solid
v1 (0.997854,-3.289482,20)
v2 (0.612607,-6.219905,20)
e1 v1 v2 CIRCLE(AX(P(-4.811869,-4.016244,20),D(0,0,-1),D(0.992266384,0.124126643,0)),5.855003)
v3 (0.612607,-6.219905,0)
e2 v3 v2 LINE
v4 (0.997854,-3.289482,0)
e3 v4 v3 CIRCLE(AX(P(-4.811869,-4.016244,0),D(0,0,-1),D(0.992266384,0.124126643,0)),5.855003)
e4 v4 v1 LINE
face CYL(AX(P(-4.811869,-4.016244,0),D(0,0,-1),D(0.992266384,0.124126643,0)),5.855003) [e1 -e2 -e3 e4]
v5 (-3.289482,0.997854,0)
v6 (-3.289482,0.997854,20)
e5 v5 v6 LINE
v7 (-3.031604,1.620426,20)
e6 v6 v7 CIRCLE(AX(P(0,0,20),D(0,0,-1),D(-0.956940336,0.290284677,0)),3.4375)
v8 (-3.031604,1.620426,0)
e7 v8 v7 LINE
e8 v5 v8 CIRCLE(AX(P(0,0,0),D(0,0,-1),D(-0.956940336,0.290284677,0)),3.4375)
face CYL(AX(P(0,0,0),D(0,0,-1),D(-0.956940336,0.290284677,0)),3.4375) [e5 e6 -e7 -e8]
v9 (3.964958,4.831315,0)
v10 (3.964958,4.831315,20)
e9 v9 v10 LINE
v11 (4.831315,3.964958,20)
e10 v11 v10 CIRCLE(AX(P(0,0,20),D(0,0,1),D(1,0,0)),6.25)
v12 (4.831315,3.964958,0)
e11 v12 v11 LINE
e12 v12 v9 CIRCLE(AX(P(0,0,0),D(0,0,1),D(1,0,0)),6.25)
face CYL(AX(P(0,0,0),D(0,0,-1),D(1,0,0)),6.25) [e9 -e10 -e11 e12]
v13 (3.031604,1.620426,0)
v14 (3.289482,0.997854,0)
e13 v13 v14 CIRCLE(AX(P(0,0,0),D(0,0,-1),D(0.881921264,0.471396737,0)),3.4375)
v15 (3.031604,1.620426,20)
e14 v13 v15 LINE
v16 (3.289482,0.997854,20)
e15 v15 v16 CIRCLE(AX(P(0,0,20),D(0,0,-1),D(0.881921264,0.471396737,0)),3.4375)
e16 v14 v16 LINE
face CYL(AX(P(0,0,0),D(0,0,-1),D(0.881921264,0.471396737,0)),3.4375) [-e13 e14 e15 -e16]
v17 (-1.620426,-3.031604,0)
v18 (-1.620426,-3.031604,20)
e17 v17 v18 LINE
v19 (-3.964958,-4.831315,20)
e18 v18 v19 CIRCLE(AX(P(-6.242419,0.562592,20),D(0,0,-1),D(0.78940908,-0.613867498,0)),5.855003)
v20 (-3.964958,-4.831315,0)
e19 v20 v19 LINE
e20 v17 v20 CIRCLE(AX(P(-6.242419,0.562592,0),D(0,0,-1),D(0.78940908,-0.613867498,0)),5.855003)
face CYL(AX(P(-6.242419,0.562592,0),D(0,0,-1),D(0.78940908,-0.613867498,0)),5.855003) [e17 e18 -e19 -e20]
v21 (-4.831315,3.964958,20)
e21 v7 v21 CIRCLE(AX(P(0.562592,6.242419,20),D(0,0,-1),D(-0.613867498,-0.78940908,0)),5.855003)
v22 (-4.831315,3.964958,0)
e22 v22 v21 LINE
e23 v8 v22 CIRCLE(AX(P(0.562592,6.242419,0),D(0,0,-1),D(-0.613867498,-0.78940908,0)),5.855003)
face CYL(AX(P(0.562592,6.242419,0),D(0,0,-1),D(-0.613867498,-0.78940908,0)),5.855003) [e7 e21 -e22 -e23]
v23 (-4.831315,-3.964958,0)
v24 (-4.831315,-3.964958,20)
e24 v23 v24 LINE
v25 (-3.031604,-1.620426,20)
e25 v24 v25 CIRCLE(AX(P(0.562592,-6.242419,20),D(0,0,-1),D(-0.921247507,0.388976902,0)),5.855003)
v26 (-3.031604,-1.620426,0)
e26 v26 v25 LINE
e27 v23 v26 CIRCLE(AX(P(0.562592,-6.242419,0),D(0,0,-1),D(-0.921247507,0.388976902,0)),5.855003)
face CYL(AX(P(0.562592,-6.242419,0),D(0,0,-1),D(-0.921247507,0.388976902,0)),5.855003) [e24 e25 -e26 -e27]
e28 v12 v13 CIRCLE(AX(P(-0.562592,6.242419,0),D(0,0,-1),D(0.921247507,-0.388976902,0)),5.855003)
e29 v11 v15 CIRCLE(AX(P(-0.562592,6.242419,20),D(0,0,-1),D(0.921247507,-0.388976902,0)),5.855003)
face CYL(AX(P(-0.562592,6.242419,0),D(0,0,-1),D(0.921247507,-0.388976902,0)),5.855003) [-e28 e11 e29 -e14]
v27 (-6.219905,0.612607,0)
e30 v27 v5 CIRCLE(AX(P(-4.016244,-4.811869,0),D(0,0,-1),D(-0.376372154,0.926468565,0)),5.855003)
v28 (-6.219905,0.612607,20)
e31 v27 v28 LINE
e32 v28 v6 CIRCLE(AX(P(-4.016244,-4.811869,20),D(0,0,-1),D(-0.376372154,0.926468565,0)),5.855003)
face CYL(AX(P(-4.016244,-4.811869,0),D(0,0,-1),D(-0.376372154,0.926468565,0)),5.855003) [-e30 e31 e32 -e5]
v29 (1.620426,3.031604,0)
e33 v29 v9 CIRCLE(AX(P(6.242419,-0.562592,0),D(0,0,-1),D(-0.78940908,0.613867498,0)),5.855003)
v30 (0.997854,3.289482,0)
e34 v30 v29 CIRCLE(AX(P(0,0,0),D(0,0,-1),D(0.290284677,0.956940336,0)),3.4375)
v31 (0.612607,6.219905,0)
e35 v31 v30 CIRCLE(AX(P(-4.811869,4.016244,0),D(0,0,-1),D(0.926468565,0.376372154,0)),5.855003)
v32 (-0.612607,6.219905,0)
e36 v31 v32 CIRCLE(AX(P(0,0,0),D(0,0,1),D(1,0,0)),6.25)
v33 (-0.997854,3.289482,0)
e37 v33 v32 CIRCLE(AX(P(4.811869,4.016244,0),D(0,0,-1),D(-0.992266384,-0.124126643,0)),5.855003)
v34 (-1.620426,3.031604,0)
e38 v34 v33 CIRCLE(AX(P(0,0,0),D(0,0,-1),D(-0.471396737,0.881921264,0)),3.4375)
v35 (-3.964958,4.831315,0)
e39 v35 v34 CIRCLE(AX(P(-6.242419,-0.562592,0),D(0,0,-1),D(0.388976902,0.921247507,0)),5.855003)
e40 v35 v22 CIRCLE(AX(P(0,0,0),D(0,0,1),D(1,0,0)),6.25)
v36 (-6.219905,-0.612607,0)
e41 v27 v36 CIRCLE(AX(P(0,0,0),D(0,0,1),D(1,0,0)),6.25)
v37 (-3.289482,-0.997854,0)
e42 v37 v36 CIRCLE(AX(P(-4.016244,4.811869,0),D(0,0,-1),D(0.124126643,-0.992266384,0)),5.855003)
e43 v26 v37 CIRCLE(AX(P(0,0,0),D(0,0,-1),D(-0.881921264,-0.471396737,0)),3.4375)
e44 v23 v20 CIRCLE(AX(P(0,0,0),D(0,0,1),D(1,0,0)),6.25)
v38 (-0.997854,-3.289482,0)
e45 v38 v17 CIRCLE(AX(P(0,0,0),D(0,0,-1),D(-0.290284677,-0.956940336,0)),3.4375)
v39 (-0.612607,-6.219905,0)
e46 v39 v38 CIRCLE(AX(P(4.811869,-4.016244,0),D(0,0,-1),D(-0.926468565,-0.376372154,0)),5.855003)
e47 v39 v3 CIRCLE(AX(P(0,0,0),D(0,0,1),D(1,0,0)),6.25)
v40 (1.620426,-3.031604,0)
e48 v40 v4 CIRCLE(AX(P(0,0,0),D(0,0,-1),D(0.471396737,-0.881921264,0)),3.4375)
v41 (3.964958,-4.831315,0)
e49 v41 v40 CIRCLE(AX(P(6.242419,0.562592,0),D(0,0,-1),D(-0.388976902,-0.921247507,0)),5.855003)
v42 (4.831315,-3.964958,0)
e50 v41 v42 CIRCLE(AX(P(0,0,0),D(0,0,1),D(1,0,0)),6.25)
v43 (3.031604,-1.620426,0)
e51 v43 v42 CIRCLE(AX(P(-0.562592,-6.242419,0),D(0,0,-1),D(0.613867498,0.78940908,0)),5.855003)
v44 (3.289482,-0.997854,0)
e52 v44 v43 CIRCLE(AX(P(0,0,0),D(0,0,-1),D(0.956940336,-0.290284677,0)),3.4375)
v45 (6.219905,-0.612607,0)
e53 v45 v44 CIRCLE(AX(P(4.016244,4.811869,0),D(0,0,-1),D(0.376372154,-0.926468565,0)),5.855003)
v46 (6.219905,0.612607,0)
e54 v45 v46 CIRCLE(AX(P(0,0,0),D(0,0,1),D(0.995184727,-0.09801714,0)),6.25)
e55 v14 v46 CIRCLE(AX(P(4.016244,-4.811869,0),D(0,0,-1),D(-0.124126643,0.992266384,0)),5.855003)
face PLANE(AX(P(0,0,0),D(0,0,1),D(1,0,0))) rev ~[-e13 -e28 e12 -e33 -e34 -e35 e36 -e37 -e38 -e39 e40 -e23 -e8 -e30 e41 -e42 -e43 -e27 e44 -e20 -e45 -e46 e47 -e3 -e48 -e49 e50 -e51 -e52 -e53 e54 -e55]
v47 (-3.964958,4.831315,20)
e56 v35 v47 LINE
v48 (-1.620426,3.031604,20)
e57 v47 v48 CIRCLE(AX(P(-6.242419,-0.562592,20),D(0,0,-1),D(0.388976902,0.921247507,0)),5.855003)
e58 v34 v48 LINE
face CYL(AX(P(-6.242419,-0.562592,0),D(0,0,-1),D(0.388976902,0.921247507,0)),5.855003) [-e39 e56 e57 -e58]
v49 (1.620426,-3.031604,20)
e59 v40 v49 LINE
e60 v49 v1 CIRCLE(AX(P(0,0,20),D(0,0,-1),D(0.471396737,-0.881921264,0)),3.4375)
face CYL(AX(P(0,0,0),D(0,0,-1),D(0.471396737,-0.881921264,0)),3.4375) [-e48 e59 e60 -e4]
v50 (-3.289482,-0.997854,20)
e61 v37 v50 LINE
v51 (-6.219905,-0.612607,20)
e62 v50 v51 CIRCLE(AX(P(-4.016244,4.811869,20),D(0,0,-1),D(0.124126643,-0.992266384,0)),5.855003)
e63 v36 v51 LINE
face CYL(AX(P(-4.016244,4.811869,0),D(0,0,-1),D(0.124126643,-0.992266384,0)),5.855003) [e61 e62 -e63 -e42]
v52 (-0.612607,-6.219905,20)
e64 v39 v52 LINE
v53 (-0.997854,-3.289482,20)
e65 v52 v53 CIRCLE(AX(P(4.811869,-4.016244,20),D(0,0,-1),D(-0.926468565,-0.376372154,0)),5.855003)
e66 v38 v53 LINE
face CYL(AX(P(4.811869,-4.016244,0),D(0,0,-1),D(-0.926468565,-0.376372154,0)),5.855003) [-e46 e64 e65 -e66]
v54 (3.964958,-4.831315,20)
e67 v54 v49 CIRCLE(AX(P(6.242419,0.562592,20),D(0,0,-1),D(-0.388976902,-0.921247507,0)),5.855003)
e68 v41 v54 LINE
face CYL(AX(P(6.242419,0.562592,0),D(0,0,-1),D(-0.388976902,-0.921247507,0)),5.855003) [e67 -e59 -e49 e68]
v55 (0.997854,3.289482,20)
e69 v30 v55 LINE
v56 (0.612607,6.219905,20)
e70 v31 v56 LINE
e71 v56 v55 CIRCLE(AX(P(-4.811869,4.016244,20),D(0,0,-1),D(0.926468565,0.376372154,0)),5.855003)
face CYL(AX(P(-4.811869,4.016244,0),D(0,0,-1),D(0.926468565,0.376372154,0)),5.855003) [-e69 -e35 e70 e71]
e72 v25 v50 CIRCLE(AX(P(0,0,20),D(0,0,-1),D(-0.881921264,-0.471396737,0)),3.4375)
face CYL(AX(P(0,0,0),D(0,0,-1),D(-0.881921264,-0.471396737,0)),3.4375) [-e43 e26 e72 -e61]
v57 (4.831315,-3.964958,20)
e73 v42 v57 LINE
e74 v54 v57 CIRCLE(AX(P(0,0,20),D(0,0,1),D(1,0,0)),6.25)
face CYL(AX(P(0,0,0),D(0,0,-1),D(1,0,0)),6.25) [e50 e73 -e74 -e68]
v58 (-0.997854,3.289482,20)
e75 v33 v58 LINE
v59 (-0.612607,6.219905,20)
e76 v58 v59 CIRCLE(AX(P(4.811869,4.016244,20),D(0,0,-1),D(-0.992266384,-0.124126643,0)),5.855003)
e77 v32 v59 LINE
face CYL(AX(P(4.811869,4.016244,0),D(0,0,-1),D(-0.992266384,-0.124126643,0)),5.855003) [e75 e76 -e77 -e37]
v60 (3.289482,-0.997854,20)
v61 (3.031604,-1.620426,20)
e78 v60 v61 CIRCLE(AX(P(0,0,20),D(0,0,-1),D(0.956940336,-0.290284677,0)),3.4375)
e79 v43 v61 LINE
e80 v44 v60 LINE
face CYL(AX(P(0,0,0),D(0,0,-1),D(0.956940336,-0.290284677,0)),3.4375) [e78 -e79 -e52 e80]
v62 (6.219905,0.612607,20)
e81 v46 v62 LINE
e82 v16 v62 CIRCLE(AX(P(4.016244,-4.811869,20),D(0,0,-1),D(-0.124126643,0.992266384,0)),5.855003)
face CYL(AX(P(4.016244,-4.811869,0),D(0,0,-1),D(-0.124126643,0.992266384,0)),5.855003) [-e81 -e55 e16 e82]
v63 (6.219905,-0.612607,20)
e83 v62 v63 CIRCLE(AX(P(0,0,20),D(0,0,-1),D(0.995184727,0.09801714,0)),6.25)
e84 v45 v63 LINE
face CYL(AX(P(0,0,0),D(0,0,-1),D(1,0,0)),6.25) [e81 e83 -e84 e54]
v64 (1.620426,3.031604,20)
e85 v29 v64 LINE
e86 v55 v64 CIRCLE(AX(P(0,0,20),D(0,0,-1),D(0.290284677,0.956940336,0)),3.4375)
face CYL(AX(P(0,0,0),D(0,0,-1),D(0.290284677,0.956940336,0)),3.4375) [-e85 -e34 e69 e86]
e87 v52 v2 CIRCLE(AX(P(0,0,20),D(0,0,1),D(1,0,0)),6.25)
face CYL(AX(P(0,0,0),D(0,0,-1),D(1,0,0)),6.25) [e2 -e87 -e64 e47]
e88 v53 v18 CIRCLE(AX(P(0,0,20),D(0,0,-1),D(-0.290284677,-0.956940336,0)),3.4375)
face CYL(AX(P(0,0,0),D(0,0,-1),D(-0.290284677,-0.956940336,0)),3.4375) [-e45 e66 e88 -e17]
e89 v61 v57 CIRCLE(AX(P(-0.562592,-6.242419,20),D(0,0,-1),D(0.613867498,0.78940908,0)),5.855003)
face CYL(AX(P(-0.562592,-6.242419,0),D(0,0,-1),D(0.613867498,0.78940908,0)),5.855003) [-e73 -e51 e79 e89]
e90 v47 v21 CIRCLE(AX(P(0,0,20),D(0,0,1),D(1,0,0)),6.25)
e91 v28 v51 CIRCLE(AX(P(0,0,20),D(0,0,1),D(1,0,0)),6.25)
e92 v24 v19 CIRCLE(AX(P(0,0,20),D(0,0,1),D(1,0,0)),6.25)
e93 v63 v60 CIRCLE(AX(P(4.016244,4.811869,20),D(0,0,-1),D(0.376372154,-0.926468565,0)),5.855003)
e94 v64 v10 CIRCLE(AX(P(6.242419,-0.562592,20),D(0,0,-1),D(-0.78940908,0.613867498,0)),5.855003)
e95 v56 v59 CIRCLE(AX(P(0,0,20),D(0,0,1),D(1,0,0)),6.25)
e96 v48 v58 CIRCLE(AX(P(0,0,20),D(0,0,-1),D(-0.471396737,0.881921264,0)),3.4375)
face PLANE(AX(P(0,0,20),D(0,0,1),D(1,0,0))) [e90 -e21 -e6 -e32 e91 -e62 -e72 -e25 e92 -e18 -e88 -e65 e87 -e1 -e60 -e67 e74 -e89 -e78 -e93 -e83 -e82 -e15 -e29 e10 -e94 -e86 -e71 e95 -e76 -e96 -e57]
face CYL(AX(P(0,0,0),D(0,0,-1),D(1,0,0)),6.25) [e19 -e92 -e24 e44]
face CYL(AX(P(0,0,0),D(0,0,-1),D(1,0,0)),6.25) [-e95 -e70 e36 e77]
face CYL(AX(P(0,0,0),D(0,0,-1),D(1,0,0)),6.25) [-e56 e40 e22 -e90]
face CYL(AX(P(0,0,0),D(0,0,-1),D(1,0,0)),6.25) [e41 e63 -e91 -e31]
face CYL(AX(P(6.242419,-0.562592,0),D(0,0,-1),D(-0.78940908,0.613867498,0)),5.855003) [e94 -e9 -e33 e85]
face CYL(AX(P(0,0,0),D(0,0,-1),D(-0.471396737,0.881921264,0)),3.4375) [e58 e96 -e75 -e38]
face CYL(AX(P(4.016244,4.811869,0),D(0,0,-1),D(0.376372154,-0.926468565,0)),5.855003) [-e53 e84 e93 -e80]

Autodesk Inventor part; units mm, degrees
sketch "Sketch1" plane through (0, 0, 0) normal (0, 0, 1) x (1, 0, 0)
  circle A0 centre (0, 0) radius 6.25
  dimension "d0" = 12.5
extrude "Extrusion1" add sketch "Sketch1" along normal blind 20
ref_plane "Work Plane2" through (0, 0, 10) normal (0, 0, 1) x (1, 0, 0)
sketch "Sketch2" plane through (0, 0, 0) normal (0, 0, -1) x (-1, 0, 0)
  circle A0 centre (0, 0) radius 6.25 projected
  circle A1 centre (0, 0) radius 5
  dimension "d3" = 10
surface extrude "Pitch Diameter" sketch "Sketch2" against normal through all shown no curves A1
ref_plane "Work Plane8" through (0, 0, 0) normal (0.9238795, 0.3826834, 0) x (0, 0, 1)
ref_plane "Work Plane9" through (0, 0, 0) normal (1, 0, 0) x (0, 1, 0)
spur gear teeth "Spur Gear" teeth 8 pitch diameter 10 tip diameter 12.5 root diameter 6.875 face width 20 start plane through (0, 0, 0) normal (0, 0, -1) x (-1, 0, 0)
equation "\"d0\" = da_da"
equation "\"d1\" = da_b"
equation "\"d3\" = da_d"
equation "\"da_da\" = 12.5"
equation "\"da_b\" = 20"
equation "\"da_d\" = 10"
properties part number "Spur Gear1" material "Steel"
